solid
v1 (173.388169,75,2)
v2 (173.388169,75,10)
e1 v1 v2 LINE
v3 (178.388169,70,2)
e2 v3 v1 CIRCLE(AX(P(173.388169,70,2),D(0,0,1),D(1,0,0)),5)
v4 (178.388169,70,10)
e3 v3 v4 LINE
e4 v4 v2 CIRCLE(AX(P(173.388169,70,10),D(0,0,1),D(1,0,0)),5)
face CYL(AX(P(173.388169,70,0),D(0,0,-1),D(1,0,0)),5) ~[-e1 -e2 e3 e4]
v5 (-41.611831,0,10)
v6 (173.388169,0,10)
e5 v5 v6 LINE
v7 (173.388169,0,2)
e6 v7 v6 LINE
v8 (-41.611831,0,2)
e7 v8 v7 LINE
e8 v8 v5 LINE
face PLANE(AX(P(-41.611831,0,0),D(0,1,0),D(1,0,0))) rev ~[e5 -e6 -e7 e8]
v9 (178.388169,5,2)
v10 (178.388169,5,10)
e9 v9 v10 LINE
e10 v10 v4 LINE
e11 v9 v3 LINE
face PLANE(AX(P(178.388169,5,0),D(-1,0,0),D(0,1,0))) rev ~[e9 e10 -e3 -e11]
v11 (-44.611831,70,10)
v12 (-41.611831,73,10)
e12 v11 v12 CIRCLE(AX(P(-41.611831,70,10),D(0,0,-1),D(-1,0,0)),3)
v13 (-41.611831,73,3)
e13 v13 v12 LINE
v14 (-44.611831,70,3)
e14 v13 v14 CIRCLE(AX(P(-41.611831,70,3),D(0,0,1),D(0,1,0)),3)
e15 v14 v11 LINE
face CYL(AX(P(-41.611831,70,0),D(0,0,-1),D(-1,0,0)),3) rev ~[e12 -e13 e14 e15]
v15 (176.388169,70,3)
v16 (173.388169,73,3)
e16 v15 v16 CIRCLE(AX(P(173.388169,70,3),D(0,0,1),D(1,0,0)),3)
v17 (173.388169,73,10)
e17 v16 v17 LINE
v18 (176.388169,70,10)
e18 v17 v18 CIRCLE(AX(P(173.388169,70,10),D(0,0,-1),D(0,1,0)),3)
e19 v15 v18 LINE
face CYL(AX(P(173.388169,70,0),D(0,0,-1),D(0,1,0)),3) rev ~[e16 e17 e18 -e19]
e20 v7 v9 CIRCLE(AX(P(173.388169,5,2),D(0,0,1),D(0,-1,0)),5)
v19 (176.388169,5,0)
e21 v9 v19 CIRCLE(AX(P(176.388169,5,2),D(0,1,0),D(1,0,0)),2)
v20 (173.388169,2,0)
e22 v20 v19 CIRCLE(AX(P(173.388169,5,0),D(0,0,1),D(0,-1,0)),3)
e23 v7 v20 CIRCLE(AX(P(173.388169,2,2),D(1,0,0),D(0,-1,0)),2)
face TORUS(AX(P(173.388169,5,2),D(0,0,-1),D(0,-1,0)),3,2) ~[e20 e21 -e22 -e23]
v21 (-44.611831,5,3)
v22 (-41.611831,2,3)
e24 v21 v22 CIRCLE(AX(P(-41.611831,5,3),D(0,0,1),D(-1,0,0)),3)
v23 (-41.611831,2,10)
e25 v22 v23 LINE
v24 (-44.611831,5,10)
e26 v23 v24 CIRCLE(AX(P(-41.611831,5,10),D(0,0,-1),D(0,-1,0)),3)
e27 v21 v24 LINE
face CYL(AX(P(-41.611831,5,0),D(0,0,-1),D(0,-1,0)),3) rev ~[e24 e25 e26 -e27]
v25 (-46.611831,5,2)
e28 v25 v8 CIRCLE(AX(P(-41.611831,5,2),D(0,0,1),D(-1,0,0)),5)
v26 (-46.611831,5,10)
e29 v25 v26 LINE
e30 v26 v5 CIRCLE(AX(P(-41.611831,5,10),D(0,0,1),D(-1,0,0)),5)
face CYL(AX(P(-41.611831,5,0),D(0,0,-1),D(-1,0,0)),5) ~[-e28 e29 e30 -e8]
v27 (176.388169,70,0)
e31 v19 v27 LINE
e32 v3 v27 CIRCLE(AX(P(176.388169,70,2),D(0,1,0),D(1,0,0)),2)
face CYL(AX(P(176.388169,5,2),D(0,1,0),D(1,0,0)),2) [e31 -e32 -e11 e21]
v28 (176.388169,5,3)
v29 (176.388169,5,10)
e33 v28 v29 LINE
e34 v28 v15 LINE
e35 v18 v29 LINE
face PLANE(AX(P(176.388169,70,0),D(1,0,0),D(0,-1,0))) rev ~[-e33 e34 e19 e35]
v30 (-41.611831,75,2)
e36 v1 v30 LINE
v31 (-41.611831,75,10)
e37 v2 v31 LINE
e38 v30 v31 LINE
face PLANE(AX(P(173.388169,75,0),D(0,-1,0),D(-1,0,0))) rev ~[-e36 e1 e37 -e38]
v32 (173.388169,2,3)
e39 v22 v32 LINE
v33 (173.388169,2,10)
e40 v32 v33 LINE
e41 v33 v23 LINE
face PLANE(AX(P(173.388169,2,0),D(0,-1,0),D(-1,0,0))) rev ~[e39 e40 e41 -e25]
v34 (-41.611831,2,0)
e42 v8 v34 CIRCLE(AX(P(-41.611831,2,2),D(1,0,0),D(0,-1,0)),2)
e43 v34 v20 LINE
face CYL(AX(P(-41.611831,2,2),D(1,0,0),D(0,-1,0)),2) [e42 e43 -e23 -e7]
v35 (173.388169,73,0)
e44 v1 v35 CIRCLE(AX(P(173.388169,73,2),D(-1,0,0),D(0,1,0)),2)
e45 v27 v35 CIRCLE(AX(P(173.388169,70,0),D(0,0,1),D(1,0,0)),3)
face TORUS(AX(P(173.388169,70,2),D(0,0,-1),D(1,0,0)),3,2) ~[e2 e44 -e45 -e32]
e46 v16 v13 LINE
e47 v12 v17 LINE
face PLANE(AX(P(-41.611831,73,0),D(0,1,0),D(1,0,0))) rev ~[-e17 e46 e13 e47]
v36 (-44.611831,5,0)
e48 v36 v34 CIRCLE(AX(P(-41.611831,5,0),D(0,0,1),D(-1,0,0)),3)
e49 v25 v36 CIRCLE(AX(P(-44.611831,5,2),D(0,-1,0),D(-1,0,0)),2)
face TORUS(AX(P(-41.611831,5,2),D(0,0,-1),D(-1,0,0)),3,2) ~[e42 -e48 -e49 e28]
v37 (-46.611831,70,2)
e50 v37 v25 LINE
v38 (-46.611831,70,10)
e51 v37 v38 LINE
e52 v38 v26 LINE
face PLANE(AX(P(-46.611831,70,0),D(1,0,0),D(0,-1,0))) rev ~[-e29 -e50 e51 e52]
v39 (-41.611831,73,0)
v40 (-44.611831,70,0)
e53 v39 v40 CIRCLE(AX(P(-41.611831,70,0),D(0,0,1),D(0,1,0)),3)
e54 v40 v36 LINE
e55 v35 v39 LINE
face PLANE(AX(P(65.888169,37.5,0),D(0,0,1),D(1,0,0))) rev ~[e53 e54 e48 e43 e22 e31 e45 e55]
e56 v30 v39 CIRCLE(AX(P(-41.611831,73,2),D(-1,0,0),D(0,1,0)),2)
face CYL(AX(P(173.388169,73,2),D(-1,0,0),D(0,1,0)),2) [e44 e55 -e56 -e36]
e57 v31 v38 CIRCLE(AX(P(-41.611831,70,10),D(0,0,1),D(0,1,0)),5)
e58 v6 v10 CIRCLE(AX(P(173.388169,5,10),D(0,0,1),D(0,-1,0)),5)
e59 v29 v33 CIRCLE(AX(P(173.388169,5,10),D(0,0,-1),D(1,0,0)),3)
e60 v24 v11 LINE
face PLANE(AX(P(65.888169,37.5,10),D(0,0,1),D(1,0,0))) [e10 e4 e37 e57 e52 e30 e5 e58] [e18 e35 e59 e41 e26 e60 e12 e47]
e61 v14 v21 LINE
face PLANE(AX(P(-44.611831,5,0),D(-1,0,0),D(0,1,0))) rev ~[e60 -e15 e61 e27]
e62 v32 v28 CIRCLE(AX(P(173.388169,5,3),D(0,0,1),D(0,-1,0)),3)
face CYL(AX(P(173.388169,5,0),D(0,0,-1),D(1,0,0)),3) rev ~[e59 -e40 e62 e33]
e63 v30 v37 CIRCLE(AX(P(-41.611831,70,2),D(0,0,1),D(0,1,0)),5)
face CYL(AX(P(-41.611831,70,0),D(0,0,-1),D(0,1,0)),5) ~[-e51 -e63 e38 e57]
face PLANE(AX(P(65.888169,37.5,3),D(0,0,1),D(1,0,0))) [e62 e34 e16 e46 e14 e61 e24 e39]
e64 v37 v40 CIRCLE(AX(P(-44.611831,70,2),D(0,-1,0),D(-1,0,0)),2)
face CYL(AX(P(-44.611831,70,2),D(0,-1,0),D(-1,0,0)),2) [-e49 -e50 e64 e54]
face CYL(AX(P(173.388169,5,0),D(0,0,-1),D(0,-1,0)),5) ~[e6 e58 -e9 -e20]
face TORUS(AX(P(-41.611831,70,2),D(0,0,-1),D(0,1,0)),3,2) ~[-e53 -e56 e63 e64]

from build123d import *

# Parameters (mm, degrees)
F1_DEPTH = 3
F2_DEPTH = 10
F3_R     = 2


# Not quite as in the source:
# - a feature names something its author has since deleted; it is built from what else it names


with BuildPart() as f1:
    # F0 (on Top) → F1 (new body)
    with BuildSketch(Plane.XY):
        with BuildLine():
            ThreePointArc((-44.6118305922, 5), (-43.7331509357, 2.8786796564), (-41.6118305922, 2))
            Line((-41.6118305922, 2), (173.3881694078, 2))
            ThreePointArc((173.3881694078, 2), (175.5094897514, 2.8786796564), (176.3881694078, 5))
            Line((176.3881694078, 5), (176.3881694078, 70))
            ThreePointArc((176.3881694078, 70), (175.5094897514, 72.1213203436), (173.3881694078, 73))
            Line((173.3881694078, 73), (-41.6118305922, 73))
            ThreePointArc((-41.6118305922, 73), (-43.7331509357, 72.1213203436), (-44.6118305922, 70))
            Line((-44.6118305922, 70), (-44.6118305922, 5))
        make_face()
    extrude(amount=F1_DEPTH)

    # F0 (on Top) → F2 (join)
    with BuildSketch(Plane.XY):
        with BuildLine():
            Line((173.3881694078, 75), (-41.6118305922, 75))
            ThreePointArc((-41.6118305922, 75), (-45.1473644981, 73.5355339059), (-46.6118305922, 70))
            Line((-46.6118305922, 70), (-46.6118305922, 5))
            ThreePointArc((-46.6118305922, 5), (-45.1473644981, 1.4644660941), (-41.6118305922, 0))
            Line((-41.6118305922, 0), (173.3881694078, 0))
            ThreePointArc((173.3881694078, 0), (176.9237033138, 1.4644660941), (178.3881694078, 5))
            Line((178.3881694078, 5), (178.3881694078, 70))
            ThreePointArc((178.3881694078, 70), (176.9237033138, 73.5355339059), (173.3881694078, 75))
        make_face()
        with BuildLine():
            Line((173.3881694078, 2), (-41.6118305922, 2))
            ThreePointArc((-41.6118305922, 2), (-43.7331509357, 2.8786796564), (-44.6118305922, 5))
            Line((-44.6118305922, 5), (-44.6118305922, 70))
            ThreePointArc((-44.6118305922, 70), (-43.7331509357, 72.1213203436), (-41.6118305922, 73))
            Line((-41.6118305922, 73), (173.3881694078, 73))
            ThreePointArc((173.3881694078, 73), (175.5094897514, 72.1213203436), (176.3881694078, 70))
            Line((176.3881694078, 70), (176.3881694078, 5))
            ThreePointArc((176.3881694078, 5), (175.5094897514, 2.8786796564), (173.3881694078, 2))
        make_face(mode=Mode.SUBTRACT)
    extrude(amount=F2_DEPTH)

    # F3
    f3_edges = [f1.edges().sort_by_distance(p)[0] for p in [
        (65.888169, 75, 0),
    ]]
    fillet(f3_edges, radius=F3_R)


solid = f1.part
